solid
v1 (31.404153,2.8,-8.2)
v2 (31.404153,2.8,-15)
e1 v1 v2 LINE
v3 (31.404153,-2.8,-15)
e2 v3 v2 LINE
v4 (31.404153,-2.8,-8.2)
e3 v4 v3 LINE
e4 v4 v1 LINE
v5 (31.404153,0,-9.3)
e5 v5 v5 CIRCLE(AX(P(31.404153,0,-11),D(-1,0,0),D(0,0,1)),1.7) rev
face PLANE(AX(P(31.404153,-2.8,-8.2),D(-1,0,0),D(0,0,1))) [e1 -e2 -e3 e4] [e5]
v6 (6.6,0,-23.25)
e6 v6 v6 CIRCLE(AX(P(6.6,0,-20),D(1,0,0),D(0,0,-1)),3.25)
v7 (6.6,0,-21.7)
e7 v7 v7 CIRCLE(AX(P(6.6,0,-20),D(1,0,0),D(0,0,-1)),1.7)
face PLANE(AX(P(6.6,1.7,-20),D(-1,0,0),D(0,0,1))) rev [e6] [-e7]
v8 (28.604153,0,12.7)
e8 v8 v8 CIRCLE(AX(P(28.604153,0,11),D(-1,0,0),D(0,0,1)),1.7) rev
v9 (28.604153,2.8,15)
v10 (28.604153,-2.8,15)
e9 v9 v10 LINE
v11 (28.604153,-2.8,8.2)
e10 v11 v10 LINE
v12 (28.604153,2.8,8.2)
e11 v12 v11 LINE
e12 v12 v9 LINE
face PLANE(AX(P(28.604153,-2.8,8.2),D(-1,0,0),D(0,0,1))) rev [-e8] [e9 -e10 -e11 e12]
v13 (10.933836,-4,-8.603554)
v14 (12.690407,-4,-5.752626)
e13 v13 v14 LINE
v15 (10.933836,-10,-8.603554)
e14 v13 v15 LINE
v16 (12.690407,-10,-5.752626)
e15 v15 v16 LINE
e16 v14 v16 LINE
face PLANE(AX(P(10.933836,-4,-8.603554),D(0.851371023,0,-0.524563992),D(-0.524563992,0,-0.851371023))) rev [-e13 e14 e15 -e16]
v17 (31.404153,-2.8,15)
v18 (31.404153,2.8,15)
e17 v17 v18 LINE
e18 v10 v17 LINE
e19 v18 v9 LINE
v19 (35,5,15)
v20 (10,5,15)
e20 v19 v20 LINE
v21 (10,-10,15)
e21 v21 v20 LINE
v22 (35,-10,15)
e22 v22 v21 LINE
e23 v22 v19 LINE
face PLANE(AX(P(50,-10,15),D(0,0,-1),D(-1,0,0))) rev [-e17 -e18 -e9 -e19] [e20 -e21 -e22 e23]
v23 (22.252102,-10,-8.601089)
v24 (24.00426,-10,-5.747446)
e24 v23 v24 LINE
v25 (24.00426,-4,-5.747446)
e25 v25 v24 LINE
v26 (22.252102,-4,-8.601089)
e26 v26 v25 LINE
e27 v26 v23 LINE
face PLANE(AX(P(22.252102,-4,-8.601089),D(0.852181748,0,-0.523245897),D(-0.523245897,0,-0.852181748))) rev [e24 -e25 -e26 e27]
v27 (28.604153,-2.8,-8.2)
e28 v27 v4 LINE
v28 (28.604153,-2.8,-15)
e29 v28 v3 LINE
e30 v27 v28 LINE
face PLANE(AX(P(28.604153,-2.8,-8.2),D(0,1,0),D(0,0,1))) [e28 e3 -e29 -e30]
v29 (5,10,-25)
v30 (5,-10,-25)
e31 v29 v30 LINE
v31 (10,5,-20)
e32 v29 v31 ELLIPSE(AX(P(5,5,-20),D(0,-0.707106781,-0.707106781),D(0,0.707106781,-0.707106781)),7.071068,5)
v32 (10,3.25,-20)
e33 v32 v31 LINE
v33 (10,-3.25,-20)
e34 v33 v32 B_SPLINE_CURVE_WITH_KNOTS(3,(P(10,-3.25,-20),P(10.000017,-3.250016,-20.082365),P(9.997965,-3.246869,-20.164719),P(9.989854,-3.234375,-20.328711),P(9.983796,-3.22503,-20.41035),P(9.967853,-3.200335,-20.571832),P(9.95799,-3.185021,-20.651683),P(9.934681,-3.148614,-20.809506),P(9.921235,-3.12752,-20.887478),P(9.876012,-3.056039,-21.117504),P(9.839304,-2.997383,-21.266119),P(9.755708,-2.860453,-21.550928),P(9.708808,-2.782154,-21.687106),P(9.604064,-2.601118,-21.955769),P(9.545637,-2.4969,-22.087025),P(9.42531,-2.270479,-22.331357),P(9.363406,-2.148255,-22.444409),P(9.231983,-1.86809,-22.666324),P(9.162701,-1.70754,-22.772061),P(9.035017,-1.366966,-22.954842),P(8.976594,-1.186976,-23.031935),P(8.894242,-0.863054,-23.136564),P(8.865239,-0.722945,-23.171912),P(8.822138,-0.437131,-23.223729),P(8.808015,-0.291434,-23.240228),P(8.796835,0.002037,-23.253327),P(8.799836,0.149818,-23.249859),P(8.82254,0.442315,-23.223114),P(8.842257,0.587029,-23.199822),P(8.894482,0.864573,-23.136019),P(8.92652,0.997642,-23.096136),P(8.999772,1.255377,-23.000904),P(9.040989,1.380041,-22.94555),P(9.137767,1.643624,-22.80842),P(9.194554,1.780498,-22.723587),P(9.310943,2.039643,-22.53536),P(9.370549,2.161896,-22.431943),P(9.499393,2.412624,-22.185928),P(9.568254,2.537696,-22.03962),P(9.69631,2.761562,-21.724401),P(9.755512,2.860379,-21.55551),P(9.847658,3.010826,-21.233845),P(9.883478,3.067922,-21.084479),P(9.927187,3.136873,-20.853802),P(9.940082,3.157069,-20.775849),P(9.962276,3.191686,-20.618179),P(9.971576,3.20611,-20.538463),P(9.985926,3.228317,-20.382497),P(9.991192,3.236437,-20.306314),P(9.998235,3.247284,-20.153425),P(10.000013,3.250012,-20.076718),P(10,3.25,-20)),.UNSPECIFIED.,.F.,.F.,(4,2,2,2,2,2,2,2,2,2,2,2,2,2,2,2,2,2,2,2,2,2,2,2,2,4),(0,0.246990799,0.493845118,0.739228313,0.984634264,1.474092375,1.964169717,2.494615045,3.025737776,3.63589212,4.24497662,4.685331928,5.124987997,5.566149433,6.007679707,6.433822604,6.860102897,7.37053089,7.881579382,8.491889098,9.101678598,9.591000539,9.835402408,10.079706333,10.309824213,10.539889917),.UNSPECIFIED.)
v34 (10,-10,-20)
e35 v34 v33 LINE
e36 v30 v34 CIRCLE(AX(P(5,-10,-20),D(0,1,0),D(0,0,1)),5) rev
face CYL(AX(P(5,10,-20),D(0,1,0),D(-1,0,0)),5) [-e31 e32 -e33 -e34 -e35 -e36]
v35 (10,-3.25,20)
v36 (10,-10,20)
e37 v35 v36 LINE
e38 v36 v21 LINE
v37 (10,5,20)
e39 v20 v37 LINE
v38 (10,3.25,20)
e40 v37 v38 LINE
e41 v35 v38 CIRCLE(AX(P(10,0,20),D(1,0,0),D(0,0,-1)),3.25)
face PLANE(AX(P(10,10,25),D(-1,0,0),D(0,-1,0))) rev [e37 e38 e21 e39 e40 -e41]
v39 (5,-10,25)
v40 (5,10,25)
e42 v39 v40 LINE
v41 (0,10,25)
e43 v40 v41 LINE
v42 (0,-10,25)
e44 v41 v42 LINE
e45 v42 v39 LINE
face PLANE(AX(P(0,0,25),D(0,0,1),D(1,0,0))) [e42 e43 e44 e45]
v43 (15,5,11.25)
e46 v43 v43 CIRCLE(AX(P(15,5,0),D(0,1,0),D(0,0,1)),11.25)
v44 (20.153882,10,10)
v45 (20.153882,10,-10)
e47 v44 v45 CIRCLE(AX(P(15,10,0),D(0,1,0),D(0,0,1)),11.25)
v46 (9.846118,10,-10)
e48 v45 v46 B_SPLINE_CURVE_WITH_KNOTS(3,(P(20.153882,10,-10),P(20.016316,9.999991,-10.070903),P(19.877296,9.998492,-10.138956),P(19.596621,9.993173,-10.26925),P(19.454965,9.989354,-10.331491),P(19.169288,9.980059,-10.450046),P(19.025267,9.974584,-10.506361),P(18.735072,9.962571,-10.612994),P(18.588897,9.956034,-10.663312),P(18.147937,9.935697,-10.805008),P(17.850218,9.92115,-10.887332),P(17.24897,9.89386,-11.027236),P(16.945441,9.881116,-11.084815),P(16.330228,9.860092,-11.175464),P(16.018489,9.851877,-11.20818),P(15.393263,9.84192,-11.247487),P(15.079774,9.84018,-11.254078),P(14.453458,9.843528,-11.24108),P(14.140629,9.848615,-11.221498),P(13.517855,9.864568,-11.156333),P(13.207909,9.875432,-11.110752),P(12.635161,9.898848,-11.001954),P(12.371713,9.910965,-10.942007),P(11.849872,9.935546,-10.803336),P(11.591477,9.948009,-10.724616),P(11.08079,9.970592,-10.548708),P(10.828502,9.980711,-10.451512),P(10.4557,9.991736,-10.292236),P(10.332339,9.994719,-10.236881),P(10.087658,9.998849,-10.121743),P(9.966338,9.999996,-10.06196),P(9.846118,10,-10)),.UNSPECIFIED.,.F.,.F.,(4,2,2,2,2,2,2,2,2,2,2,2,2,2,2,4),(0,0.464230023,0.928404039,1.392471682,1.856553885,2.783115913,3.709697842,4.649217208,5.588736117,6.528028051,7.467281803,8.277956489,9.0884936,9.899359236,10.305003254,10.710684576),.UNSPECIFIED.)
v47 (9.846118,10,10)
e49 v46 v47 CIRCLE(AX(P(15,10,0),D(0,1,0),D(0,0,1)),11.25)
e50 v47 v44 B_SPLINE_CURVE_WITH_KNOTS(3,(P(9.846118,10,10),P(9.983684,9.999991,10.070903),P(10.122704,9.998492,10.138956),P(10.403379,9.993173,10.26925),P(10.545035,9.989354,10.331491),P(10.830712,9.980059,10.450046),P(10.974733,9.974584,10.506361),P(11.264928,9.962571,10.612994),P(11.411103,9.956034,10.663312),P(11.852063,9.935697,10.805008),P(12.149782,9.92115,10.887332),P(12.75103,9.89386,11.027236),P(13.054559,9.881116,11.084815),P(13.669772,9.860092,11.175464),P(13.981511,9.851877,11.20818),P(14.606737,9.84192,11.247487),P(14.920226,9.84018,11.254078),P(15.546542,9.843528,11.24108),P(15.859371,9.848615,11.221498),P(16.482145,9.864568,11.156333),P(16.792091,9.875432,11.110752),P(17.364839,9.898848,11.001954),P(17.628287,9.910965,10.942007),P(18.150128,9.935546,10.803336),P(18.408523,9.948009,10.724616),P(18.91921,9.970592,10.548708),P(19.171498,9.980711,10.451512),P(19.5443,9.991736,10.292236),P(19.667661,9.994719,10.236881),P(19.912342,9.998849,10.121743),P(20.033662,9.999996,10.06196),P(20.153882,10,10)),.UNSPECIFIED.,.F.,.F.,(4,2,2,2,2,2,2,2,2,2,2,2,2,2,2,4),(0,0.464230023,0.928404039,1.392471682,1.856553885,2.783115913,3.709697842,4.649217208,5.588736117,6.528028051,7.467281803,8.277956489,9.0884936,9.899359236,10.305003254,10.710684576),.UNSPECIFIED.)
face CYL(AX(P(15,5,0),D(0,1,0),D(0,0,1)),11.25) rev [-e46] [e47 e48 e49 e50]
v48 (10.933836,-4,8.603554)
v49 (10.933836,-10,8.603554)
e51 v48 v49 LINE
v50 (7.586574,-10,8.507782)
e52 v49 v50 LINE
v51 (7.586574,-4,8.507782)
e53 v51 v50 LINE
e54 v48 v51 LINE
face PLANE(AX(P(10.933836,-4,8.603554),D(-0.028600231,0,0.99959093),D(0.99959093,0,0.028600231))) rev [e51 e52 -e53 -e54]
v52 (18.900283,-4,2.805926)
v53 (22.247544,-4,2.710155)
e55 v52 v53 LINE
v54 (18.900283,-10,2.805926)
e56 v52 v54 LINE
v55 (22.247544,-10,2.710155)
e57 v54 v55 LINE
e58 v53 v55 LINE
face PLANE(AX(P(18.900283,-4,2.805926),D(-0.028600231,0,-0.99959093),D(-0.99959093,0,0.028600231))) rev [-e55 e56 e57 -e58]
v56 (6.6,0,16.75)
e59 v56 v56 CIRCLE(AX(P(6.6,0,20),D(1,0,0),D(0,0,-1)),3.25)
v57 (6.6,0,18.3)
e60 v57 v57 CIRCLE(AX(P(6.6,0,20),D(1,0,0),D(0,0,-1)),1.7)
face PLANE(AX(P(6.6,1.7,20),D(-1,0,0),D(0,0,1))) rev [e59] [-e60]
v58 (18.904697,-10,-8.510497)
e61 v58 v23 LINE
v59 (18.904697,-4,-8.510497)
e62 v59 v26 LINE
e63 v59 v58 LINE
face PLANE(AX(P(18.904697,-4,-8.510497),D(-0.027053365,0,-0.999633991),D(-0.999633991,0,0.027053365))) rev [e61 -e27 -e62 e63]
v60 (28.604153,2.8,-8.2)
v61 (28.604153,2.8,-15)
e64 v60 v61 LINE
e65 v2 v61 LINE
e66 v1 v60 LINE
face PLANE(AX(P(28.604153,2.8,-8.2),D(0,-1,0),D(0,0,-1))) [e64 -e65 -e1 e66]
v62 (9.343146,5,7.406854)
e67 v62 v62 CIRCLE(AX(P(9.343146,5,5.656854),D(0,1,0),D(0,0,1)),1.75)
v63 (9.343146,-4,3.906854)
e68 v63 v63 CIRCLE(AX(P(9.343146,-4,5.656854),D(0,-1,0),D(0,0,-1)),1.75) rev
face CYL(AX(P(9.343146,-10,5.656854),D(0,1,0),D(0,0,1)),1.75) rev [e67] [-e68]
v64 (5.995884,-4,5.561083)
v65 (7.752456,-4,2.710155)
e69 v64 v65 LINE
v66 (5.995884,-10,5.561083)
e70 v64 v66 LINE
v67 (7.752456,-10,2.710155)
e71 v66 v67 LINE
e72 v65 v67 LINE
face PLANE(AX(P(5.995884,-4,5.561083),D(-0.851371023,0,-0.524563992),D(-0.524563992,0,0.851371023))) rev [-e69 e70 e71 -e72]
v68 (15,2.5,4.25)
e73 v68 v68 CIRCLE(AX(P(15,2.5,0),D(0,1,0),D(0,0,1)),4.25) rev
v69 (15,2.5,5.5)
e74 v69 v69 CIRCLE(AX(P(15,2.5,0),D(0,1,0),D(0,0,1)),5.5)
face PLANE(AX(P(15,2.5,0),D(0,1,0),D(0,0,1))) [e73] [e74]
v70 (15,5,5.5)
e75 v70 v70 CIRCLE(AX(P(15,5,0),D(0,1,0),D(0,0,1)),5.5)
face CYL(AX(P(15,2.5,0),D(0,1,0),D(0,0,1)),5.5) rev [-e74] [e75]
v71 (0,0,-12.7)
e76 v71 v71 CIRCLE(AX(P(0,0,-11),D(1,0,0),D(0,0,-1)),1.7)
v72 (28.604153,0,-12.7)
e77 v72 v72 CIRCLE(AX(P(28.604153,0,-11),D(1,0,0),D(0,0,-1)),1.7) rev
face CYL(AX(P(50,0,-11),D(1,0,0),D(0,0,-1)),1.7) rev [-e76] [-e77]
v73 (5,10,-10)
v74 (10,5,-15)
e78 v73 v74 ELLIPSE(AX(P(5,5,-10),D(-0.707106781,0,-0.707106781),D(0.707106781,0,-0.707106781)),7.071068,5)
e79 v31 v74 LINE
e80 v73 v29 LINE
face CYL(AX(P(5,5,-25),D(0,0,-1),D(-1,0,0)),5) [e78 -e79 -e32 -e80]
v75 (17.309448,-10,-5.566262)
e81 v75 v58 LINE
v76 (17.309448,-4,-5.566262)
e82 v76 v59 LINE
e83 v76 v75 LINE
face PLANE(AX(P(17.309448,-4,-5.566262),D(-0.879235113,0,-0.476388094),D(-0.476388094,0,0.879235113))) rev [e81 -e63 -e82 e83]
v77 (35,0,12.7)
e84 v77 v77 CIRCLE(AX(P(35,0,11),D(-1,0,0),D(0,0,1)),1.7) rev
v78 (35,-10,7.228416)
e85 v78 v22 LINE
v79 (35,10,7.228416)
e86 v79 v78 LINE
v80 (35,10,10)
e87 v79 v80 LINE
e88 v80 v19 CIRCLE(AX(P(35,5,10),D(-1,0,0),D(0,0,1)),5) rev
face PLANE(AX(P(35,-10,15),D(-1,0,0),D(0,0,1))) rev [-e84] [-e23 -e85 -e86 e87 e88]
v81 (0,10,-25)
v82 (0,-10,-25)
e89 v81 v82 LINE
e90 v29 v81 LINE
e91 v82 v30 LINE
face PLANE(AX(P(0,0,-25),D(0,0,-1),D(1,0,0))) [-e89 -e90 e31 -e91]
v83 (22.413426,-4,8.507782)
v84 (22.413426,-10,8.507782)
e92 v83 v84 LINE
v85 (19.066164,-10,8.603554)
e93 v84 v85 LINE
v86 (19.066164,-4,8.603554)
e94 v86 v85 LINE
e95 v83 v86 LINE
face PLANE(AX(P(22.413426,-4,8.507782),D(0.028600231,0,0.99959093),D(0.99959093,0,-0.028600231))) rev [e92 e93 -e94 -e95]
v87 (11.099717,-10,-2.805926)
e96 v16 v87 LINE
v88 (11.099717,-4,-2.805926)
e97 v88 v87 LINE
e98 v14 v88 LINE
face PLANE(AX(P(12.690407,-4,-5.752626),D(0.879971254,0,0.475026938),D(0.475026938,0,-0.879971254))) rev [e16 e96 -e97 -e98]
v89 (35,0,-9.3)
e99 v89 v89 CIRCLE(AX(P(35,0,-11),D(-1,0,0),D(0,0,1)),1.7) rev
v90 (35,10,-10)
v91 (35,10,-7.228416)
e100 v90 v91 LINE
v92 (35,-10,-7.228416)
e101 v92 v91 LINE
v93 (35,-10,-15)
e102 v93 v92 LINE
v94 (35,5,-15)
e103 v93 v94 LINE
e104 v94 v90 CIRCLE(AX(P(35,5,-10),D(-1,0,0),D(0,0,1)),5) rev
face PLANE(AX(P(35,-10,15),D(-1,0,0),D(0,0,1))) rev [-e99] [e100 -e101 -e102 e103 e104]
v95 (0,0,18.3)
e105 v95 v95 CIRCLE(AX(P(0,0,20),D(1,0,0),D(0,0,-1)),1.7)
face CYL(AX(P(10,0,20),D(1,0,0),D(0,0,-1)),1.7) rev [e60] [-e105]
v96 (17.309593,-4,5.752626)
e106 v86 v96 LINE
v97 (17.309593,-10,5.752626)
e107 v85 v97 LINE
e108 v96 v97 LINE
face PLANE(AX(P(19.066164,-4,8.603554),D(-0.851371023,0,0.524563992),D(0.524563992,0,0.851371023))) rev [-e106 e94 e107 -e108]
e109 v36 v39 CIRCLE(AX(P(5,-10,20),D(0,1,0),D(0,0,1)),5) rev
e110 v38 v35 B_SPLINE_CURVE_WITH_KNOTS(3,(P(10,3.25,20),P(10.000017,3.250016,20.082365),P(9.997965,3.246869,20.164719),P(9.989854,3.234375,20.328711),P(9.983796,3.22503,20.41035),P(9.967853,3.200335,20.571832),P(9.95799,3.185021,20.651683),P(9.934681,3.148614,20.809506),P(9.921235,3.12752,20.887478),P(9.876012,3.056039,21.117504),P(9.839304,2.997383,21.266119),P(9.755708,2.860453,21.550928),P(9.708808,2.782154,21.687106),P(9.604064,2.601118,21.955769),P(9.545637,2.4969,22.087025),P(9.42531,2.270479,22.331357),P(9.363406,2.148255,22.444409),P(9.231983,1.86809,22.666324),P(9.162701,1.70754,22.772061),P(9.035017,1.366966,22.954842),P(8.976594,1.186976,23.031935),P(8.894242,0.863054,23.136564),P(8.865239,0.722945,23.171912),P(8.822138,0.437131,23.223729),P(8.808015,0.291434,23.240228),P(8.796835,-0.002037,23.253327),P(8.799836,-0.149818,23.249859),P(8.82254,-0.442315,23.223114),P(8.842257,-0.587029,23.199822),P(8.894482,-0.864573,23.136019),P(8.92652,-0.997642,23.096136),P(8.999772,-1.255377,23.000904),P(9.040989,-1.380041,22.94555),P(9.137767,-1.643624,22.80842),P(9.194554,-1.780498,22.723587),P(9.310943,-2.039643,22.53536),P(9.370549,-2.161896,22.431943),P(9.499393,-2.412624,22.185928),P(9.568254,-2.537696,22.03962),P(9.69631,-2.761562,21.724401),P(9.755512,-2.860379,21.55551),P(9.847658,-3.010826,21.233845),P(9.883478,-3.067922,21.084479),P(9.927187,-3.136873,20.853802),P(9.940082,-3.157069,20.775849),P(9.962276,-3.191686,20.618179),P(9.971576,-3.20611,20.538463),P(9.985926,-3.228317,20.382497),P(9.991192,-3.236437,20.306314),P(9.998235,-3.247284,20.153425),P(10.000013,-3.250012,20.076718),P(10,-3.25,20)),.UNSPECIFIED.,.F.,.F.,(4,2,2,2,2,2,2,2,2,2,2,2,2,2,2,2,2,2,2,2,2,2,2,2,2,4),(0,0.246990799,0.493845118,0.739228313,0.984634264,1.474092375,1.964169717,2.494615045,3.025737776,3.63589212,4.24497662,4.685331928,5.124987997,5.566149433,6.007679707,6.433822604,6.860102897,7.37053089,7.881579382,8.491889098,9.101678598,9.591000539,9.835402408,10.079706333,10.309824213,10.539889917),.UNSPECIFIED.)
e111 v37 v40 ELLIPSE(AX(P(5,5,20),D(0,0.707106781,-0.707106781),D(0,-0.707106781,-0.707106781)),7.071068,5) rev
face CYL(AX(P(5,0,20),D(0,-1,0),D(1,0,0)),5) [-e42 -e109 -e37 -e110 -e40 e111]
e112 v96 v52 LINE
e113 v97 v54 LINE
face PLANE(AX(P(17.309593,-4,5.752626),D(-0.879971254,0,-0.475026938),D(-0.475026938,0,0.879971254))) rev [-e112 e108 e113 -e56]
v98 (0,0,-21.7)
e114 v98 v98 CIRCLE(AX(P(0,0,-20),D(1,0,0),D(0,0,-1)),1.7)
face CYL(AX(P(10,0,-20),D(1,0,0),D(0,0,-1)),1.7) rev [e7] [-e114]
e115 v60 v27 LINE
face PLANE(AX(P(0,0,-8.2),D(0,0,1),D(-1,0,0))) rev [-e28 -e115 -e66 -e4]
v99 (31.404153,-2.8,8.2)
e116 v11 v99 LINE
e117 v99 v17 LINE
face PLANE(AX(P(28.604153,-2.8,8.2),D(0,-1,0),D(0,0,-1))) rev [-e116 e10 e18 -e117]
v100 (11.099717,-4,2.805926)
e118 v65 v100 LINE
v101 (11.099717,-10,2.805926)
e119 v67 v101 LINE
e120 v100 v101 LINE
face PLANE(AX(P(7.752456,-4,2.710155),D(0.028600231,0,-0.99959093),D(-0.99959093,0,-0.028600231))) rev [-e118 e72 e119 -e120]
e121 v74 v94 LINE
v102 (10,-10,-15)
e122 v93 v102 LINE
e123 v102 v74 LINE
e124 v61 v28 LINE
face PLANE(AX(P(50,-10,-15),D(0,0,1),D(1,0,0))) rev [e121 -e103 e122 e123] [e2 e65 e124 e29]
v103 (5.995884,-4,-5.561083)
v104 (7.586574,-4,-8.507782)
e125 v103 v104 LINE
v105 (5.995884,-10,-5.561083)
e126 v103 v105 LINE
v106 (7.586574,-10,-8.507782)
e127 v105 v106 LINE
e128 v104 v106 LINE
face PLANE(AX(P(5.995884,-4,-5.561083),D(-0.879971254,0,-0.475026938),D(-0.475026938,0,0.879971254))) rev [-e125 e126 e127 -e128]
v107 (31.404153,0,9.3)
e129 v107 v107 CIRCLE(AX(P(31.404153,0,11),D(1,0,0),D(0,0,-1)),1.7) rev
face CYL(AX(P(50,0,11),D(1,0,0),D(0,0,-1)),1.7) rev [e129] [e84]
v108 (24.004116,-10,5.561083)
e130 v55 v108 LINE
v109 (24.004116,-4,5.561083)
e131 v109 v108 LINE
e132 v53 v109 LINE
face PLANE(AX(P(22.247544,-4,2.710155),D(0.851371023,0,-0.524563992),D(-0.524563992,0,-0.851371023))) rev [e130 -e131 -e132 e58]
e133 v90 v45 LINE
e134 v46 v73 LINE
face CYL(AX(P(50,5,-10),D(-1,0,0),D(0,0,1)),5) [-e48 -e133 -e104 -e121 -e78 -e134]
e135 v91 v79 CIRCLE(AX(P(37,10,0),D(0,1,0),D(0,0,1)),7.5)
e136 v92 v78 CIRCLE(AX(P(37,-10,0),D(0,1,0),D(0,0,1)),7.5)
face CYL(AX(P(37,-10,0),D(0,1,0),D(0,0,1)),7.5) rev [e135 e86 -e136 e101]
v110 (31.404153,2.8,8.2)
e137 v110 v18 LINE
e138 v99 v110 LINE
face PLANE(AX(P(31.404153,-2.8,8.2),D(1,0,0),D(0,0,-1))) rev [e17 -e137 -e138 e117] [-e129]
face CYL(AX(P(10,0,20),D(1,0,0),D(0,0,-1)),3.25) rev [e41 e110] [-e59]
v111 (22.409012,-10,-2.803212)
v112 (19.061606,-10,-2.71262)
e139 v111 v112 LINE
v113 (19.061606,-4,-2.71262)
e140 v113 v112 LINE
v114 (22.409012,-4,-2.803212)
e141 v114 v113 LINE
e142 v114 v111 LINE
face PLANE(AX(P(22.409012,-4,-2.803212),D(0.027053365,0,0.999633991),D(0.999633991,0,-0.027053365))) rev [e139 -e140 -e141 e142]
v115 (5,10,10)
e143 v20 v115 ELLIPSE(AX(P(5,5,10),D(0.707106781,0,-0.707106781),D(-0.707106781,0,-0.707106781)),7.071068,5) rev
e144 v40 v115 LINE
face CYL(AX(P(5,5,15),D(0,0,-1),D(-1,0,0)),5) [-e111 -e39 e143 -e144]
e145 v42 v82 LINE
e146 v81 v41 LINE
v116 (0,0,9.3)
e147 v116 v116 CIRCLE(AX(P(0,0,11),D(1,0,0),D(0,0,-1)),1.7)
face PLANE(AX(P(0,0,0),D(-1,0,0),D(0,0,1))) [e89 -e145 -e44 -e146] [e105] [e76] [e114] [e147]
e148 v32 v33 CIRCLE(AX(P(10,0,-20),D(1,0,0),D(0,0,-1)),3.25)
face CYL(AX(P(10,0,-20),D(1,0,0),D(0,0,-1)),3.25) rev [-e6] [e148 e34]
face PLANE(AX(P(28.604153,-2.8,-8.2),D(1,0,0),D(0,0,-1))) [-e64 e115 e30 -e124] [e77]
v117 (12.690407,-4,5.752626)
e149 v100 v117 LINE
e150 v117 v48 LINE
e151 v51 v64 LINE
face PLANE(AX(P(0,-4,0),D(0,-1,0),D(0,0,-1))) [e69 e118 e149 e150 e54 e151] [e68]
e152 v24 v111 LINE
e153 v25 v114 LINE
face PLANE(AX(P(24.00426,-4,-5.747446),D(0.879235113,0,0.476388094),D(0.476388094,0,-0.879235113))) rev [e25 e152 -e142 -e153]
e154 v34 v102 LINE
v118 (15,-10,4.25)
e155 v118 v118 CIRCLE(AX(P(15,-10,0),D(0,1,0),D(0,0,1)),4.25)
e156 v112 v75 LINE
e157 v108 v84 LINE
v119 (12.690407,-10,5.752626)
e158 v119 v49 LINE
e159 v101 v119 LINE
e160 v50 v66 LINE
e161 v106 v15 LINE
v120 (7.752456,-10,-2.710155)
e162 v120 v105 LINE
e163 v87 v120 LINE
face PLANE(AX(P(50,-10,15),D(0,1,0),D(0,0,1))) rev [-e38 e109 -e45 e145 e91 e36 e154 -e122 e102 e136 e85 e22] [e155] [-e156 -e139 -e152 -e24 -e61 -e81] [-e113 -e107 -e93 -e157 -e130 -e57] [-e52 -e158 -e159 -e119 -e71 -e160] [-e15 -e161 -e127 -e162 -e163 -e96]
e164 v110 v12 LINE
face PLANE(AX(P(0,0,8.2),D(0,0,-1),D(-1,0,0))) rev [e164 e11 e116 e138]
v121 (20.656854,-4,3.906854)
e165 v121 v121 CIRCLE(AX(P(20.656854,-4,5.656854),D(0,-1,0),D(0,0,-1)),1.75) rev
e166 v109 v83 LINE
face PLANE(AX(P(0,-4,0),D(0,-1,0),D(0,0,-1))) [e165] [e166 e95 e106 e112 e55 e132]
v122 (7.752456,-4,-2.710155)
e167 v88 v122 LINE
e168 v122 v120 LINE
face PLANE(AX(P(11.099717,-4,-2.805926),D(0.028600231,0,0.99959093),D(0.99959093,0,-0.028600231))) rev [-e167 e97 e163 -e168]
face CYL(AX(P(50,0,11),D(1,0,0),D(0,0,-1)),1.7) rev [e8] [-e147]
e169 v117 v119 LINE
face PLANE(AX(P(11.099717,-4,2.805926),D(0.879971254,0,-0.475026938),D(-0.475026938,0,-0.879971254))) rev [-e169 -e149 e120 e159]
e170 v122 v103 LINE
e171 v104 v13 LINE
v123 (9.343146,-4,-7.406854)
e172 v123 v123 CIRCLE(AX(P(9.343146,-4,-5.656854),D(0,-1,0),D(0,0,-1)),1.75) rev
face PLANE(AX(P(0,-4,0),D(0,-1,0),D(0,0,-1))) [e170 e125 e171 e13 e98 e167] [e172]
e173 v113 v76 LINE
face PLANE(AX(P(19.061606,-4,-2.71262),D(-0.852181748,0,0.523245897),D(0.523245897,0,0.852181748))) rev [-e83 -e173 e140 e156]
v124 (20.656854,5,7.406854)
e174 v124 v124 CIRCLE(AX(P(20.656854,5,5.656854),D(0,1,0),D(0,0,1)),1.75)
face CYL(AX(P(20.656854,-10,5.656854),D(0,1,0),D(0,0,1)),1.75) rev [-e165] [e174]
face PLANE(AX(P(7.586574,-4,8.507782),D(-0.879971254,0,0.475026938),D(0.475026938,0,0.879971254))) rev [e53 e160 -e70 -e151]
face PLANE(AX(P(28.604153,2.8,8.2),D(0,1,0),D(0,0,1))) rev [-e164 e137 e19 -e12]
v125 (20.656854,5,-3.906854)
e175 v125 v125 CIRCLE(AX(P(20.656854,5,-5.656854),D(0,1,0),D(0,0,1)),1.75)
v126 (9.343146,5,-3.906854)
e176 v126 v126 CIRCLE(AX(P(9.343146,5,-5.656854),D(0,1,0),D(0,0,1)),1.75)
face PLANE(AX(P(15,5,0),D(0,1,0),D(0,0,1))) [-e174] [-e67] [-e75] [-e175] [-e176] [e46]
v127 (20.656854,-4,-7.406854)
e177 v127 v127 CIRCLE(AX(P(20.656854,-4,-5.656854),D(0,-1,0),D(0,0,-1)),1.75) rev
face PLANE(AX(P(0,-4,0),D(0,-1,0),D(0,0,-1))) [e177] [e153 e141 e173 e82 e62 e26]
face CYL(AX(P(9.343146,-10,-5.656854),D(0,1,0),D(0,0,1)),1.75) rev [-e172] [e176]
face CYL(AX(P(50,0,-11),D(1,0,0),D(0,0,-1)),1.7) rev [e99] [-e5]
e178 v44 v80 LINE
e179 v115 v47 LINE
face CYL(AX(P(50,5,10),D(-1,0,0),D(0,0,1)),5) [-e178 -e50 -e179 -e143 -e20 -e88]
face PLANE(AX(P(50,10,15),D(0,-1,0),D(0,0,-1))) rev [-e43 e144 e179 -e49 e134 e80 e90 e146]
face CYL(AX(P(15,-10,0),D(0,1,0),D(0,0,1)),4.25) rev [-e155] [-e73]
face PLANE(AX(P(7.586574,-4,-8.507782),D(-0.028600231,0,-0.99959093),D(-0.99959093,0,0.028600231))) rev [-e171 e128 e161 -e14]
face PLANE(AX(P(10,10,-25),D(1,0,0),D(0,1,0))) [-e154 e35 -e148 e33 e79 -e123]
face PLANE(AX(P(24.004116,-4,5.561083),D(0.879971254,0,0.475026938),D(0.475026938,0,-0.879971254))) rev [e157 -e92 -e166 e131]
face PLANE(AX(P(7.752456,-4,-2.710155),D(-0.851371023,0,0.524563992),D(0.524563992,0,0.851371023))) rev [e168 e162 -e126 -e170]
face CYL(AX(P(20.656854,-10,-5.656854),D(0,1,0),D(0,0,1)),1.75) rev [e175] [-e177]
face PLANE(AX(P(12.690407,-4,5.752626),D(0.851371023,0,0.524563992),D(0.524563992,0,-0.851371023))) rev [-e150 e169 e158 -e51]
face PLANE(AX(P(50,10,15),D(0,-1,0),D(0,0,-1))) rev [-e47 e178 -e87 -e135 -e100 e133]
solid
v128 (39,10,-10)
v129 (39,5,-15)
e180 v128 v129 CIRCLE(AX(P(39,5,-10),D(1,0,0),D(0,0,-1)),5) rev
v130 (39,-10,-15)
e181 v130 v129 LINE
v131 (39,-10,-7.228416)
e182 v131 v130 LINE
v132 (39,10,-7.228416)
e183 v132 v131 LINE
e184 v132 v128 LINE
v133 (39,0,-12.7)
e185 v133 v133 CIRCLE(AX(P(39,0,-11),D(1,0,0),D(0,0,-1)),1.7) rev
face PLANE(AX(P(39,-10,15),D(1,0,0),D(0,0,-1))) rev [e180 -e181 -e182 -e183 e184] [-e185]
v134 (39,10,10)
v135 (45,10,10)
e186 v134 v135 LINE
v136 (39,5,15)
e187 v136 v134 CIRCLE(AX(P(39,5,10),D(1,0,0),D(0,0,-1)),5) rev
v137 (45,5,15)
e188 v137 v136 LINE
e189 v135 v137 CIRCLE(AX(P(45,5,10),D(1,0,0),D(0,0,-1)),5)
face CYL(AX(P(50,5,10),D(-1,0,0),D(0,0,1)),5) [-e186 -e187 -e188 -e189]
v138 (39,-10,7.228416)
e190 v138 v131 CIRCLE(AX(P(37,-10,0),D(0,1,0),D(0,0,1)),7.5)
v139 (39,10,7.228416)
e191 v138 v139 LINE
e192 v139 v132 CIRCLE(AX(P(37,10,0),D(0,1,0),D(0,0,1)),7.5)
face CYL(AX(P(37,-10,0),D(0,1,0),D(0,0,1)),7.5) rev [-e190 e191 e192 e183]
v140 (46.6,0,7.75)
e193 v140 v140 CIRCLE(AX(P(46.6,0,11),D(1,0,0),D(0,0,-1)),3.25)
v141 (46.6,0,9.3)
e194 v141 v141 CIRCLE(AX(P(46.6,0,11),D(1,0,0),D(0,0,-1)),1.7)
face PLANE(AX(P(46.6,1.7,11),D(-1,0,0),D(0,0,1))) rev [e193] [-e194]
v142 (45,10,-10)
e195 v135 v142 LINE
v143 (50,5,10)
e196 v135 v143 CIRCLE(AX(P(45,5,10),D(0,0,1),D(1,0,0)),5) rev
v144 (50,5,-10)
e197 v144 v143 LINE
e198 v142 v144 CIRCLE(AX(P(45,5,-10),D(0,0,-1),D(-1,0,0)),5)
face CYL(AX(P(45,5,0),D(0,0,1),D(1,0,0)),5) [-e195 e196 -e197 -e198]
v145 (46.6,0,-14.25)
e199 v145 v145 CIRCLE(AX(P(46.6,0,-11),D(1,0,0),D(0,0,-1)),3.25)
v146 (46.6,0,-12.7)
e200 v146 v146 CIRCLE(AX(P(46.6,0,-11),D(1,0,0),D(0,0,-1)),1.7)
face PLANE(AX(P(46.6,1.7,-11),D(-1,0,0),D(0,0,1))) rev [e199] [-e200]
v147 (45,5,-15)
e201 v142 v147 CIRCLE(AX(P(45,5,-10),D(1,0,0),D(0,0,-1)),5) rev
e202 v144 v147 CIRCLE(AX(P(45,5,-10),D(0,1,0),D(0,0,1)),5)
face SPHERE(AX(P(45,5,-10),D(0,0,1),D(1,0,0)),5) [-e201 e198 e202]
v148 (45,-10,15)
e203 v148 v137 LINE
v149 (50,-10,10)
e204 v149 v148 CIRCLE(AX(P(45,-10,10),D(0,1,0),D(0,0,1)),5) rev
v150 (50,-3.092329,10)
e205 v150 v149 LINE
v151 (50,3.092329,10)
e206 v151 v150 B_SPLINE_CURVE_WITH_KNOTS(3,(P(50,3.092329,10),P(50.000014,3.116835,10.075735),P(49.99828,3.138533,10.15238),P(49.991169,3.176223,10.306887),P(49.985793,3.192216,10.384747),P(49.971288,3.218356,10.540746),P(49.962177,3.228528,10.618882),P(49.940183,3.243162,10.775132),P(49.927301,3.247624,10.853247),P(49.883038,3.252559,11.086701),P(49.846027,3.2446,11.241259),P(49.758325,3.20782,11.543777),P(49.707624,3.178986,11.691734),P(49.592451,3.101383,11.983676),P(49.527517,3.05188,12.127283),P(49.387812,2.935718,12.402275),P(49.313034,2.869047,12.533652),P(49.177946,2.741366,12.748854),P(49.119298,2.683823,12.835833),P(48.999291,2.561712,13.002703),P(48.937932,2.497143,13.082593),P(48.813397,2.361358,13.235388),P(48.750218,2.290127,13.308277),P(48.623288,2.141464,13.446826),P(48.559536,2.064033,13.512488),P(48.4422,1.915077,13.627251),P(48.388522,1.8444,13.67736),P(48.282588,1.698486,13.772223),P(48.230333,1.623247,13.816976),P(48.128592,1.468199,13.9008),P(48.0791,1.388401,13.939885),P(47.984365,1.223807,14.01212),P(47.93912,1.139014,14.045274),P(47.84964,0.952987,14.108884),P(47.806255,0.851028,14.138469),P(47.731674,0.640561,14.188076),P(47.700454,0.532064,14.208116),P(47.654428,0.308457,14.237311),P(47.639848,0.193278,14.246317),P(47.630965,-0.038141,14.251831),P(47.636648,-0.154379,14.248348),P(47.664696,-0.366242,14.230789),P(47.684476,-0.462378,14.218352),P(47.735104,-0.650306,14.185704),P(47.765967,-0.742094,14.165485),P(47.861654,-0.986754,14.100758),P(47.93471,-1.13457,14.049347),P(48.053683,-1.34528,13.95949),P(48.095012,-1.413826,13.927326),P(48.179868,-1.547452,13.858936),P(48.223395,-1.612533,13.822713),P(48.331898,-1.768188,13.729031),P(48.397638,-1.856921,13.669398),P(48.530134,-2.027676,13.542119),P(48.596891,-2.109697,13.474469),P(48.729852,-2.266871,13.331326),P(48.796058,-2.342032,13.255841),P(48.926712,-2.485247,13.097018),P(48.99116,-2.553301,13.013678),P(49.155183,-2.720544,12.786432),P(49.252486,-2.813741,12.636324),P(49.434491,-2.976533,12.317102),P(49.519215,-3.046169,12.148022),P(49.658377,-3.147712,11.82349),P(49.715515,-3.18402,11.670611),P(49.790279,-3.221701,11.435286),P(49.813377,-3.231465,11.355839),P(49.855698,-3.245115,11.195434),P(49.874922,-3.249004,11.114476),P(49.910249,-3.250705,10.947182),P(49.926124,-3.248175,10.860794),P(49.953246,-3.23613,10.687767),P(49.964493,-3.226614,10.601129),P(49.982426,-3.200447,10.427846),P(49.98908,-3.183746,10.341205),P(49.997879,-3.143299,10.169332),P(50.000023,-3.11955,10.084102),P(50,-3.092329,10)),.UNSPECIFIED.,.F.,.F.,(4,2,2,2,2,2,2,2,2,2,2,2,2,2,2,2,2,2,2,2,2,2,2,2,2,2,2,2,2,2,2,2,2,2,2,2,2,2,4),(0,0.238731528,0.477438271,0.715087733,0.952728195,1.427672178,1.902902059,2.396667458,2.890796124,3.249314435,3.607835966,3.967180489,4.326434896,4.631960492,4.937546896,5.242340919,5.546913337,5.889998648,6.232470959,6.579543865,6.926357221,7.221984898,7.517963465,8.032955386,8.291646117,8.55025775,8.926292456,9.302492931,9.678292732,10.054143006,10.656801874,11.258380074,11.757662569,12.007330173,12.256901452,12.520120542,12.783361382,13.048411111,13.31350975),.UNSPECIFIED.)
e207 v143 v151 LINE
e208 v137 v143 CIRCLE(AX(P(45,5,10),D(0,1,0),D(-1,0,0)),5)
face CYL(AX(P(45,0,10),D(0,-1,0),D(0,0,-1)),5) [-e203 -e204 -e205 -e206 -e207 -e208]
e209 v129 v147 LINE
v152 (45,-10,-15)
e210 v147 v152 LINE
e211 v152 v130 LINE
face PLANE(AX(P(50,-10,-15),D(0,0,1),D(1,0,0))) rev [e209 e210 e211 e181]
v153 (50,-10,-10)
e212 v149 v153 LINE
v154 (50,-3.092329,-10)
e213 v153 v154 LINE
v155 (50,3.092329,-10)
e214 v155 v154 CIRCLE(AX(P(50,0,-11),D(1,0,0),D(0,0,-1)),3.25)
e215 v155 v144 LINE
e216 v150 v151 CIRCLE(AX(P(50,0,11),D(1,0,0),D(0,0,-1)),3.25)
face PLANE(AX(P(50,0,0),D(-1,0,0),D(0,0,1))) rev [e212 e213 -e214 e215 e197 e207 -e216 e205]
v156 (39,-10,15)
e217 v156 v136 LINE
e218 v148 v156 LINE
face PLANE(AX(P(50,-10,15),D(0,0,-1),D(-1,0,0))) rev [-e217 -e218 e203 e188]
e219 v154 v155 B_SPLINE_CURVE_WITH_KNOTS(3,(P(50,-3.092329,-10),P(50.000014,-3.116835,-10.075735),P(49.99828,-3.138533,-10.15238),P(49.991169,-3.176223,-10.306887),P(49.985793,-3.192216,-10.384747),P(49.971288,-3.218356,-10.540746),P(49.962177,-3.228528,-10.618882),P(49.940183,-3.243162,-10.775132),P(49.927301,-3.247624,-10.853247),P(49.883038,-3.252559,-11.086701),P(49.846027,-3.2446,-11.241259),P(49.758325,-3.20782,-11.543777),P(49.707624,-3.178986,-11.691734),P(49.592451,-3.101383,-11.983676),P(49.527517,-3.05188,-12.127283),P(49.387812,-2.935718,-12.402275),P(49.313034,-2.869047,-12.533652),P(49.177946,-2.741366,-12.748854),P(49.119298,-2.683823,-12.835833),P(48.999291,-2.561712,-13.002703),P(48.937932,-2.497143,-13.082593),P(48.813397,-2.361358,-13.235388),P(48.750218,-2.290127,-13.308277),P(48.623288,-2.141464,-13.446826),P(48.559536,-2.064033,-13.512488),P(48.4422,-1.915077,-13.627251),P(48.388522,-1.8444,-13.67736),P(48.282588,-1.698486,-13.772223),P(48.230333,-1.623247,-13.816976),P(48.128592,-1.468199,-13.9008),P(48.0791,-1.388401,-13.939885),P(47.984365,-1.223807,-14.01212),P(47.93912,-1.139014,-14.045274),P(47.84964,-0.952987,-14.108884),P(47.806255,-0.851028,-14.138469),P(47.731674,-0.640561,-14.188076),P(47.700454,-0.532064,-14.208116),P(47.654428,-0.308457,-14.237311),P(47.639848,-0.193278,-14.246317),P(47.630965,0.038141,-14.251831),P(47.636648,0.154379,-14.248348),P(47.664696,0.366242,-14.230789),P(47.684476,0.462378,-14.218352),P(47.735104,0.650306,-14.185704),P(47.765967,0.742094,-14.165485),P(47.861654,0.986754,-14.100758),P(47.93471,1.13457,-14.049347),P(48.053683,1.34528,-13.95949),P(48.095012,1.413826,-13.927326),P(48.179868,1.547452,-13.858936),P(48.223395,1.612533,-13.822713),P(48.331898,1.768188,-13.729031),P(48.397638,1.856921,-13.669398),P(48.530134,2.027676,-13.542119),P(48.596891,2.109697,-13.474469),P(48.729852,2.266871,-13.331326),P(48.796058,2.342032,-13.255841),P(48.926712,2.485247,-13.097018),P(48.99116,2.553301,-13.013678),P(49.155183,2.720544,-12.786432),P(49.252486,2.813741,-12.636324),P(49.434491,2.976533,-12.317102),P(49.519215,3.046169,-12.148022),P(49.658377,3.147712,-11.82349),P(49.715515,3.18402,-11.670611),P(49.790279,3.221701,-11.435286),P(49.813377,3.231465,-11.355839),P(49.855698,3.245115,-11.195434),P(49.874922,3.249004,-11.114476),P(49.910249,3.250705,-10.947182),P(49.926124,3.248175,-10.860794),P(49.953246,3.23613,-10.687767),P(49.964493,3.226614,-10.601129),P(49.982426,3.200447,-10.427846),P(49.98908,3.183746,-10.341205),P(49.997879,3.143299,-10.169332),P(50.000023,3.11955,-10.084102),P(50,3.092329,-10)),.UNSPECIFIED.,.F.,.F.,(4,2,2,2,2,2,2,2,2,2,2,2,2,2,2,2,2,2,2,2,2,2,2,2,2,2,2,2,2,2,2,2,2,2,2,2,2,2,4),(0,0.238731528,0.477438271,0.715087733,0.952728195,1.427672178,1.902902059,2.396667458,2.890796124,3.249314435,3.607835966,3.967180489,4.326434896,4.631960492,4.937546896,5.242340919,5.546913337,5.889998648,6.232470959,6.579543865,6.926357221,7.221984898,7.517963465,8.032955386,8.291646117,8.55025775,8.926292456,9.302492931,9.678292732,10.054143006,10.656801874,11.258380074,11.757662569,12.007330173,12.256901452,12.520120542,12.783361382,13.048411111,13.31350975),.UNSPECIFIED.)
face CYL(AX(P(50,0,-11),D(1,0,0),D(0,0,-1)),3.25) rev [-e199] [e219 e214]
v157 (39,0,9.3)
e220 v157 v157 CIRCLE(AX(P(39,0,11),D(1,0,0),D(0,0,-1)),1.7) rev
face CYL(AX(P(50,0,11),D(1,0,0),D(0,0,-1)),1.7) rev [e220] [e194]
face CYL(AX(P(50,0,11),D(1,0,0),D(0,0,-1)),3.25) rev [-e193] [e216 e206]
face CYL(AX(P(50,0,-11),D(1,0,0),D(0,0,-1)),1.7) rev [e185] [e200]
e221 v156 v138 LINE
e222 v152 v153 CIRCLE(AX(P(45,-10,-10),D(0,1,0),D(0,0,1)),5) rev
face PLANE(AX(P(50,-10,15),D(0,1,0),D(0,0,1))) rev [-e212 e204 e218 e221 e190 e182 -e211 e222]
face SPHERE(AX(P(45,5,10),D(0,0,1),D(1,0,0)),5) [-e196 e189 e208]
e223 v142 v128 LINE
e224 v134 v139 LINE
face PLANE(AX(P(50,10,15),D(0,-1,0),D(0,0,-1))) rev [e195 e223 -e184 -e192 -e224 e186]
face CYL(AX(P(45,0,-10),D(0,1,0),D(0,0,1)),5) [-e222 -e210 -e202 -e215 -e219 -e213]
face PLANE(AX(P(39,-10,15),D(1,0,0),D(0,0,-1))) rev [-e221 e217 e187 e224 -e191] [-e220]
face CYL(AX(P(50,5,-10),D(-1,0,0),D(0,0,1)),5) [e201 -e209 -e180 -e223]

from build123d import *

# Parameters (mm, degrees)
SKETCH1_W                                           = 30
SKETCH1_H                                           = 20
BOSS_EXTRUDE1_DEPTH                                 = 50
SKETCH2_R                                           = 4.25
SKETCH2_R_2                                         = 7.5
CUT_EXTRUDE1_DEPTH                                  = 56.901699437
SKETCH4_R                                           = 11.25
CUT_EXTRUDE3_DEPTH                                  = 5
SKETCH5_R                                           = 1.75
CUT_EXTRUDE4_DEPTH                                  = 55.313902456
CUT_EXTRUDE5_DEPTH                                  = 6
SKETCH7_W                                           = 10
SKETCH7_H                                           = 20
BOSS_EXTRUDE2_DEPTH                                 = 10
CBORE_FOR_M3_HEX_SOCKET_HEAD_CAP_SCREW4_D           = 3.4
CBORE_FOR_M3_HEX_SOCKET_HEAD_CAP_SCREW4_CBORE_D     = 6.5
CBORE_FOR_M3_HEX_SOCKET_HEAD_CAP_SCREW4_CBORE_DEPTH = 3.4
CBORE_FOR_M3_HEX_SOCKET_HEAD_CAP_SCREW3_D           = 3.4
CBORE_FOR_M3_HEX_SOCKET_HEAD_CAP_SCREW3_CBORE_D     = 6.5
CBORE_FOR_M3_HEX_SOCKET_HEAD_CAP_SCREW3_CBORE_DEPTH = 3.4
SKETCH18_W                                          = 2.8
SKETCH18_H                                          = 5.6
CUT_EXTRUDE8_DEPTH                                  = 6.8
SKETCH3_W                                           = 4
SKETCH3_H                                           = 30
CUT_EXTRUDE9_DEPTH                                  = 60.371710435
FILLET4_R                                           = 5
FILLET5_R                                           = 5
SKETCH19_R                                          = 5.5
CUT_EXTRUDE10_DEPTH                                 = 2.5


with BuildPart() as part:
    # Sketch1 → Boss-Extrude1 (new body)
    with BuildSketch(Plane(origin=(0, 0, 0), x_dir=(0, 0, -1), z_dir=(1, 0, 0))):
        Rectangle(SKETCH1_W, SKETCH1_H)
    extrude(amount=BOSS_EXTRUDE1_DEPTH)

    # Sketch2 → Cut-Extrude1 (cut, through all)
    with BuildSketch(Plane(origin=(0, 10, 0), x_dir=(1, 0, 0), z_dir=(0, 1, 0))):
        with Locations(Location((15, 0, 0), (0, 0, 270))):
            Circle(SKETCH2_R)
        with Locations(Location((37, 0, 0), (0, 0, 270))):
            Circle(SKETCH2_R_2)
    extrude(amount=-CUT_EXTRUDE1_DEPTH, mode=Mode.SUBTRACT)

    # Sketch4 → Cut-Extrude3 (cut)
    with BuildSketch(Plane(origin=(0, 10, 0), x_dir=(1, 0, 0), z_dir=(0, 1, 0))):
        with Locations(Location((15, 0, 0), (0, 0, 270))):
            Circle(SKETCH4_R)
    extrude(amount=-CUT_EXTRUDE3_DEPTH, mode=Mode.SUBTRACT)

    # Sketch5 → Cut-Extrude4 (cut, through all)
    with BuildSketch(Plane(origin=(0, 5, 0), x_dir=(1, 0, 0), z_dir=(0, 1, 0))):
        with Locations(Location((9.343145751, -5.656854249, 0), (0, 0, 270))):
            Circle(SKETCH5_R)
        with Locations(Location((9.343145751, 5.656854249, 0), (0, 0, 270))):
            Circle(SKETCH5_R)
        with Locations(Location((20.656854249, 5.656854249, 0), (0, 0, 270))):
            Circle(SKETCH5_R)
        with Locations(Location((20.656854249, -5.656854249, 0), (0, 0, 270))):
            Circle(SKETCH5_R)
    extrude(amount=-CUT_EXTRUDE4_DEPTH, mode=Mode.SUBTRACT)

    # Sketch6 → Cut-Extrude5 (cut)
    with BuildSketch(Plane.XZ.offset(10)):
        Polygon((12.690407486, 5.752625887), (10.933835947, 8.603553764), (7.586574212, 8.507782127), (5.995884015, 5.561082612), (7.752455554, 2.710154735), (11.099717289, 2.805926372), align=None)
        Polygon((17.309592514, 5.752625887), (18.900282711, 2.805926372), (22.247544446, 2.710154735), (24.004115985, 5.561082612), (22.413425788, 8.507782127), (19.066164053, 8.603553764), align=None)
        Polygon((24.004260181, -5.747446002), (22.409011974, -2.803211553), (19.061606043, -2.7126198), (17.309448318, -5.566262497), (18.904696525, -8.510496946), (22.252102456, -8.601088699), align=None)
        Polygon((12.690407486, -5.752625887), (11.099717289, -2.805926372), (7.752455554, -2.710154735), (5.995884015, -5.561082612), (7.586574212, -8.507782127), (10.933835947, -8.603553764), align=None)
    extrude(amount=-CUT_EXTRUDE5_DEPTH, mode=Mode.SUBTRACT)

    # Sketch7 → Boss-Extrude2 (add)
    with BuildSketch(Plane.XY.offset(15)):
        with Locations((5, 0)):
            Rectangle(SKETCH7_W, SKETCH7_H)
    boss_extrude2 = extrude(amount=BOSS_EXTRUDE2_DEPTH)

    # CBORE for M3 Hex Socket Head Cap Screw4 (through all)
    with Locations(Plane(origin=(10, 0, 0), x_dir=(0, 0, -1), z_dir=(1, 0, 0))):
        with Locations((-20, 0)):
            cbore_for_m3_hex_socket_head_cap_screw4 = CounterBoreHole(CBORE_FOR_M3_HEX_SOCKET_HEAD_CAP_SCREW4_D / 2, CBORE_FOR_M3_HEX_SOCKET_HEAD_CAP_SCREW4_CBORE_D / 2, CBORE_FOR_M3_HEX_SOCKET_HEAD_CAP_SCREW4_CBORE_DEPTH)

    # CBORE for M3 Hex Socket Head Cap Screw3 (through all)
    with Locations(Plane(origin=(50, 0, 0), x_dir=(0, 0, -1), z_dir=(1, 0, 0))):
        with Locations((-11, 0)):
            cbore_for_m3_hex_socket_head_cap_screw3 = CounterBoreHole(CBORE_FOR_M3_HEX_SOCKET_HEAD_CAP_SCREW3_D / 2, CBORE_FOR_M3_HEX_SOCKET_HEAD_CAP_SCREW3_CBORE_D / 2, CBORE_FOR_M3_HEX_SOCKET_HEAD_CAP_SCREW3_CBORE_DEPTH)

    # Sketch18 → Cut-Extrude8 (cut)
    with BuildSketch(Plane.XY.offset(15)):
        with Locations((30.004152543, 0)):
            Rectangle(SKETCH18_W, SKETCH18_H)
    cut_extrude8 = extrude(amount=-CUT_EXTRUDE8_DEPTH, mode=Mode.SUBTRACT)

    # Mirror9: Boss-Extrude2, CBORE for M3 Hex Socket Head Cap Screw4, CBORE for M3 Hex Socket Head Cap Screw3, Cut-Extrude8 across plane
    add(boss_extrude2.mirror(Plane(origin=(0, 0, 0), x_dir=(1, 0, 0), z_dir=(0, 0, -1))))
    add(cbore_for_m3_hex_socket_head_cap_screw4.mirror(Plane(origin=(0, 0, 0), x_dir=(1, 0, 0), z_dir=(0, 0, -1))), mode=Mode.SUBTRACT)
    add(cbore_for_m3_hex_socket_head_cap_screw3.mirror(Plane(origin=(0, 0, 0), x_dir=(1, 0, 0), z_dir=(0, 0, -1))), mode=Mode.SUBTRACT)
    add(cut_extrude8.mirror(Plane(origin=(0, 0, 0), x_dir=(1, 0, 0), z_dir=(0, 0, -1))), mode=Mode.SUBTRACT)

    # Sketch3 → Cut-Extrude9 (cut, through all)
    with BuildSketch(Plane(origin=(0, 10, 0), x_dir=(1, 0, 0), z_dir=(0, 1, 0))):
        with Locations((37, 0)):
            Rectangle(SKETCH3_W, SKETCH3_H)
    extrude(amount=-CUT_EXTRUDE9_DEPTH, mode=Mode.SUBTRACT)


with BuildPart() as cut_extrude9_piece_1:
    # of the separate pieces the step leaves, piece 1, a body of its own (cut_extrude9_pieces)
    add(part.part.solids().sort_by_distance((10, -10, 15))[0])

    # Fillet4
    # the kernel refuses this fillet: 5 mm, written as the material it takes off along each edge
    with BuildSketch(Plane(origin=(10, 10, 25), x_dir=(0, 0, -1), z_dir=(0, -1, 0)), Plane(origin=(10, 10, -25), x_dir=(-1, 0, 0), z_dir=(0, -1, 0))) as fillet4_piece_1:
        with BuildLine():
            CenterArc((FILLET4_R, -FILLET4_R), FILLET4_R, 90, 90)
            Line((0, -FILLET4_R), (-FILLET4_R * 0.02, -FILLET4_R))
            Line((-FILLET4_R * 0.02, -FILLET4_R), (-FILLET4_R * 0.02, FILLET4_R * 0.02))
            Line((-FILLET4_R * 0.02, FILLET4_R * 0.02), (FILLET4_R, FILLET4_R * 0.02))
            Line((FILLET4_R, FILLET4_R * 0.02), (FILLET4_R, 0))
        make_face()
    extrude(amount=20, mode=Mode.SUBTRACT)
    with BuildSketch(Plane(origin=(10, 10, -15), x_dir=(0, -1, 0), z_dir=(0, 0, -1))) as fillet4_piece_2:
        with BuildLine():
            CenterArc((FILLET4_R, FILLET4_R), FILLET4_R, 180, 90)
            Line((0, FILLET4_R), (-FILLET4_R * 0.02, FILLET4_R))
            Line((-FILLET4_R * 0.02, FILLET4_R), (-FILLET4_R * 0.02, -FILLET4_R * 0.02))
            Line((-FILLET4_R * 0.02, -FILLET4_R * 0.02), (FILLET4_R, -FILLET4_R * 0.02))
            Line((FILLET4_R, -FILLET4_R * 0.02), (FILLET4_R, 0))
        make_face()
    extrude(amount=10, mode=Mode.SUBTRACT)
    with BuildSketch(Plane(origin=(10, 10, 15), x_dir=(0, -1, 0), z_dir=(1, 0, 0))) as fillet4_piece_3:
        with BuildLine():
            CenterArc((FILLET4_R, FILLET4_R), FILLET4_R, 180, 90)
            Line((0, FILLET4_R), (-FILLET4_R * 0.02, FILLET4_R))
            Line((-FILLET4_R * 0.02, FILLET4_R), (-FILLET4_R * 0.02, -FILLET4_R * 0.02))
            Line((-FILLET4_R * 0.02, -FILLET4_R * 0.02), (FILLET4_R, -FILLET4_R * 0.02))
            Line((FILLET4_R, -FILLET4_R * 0.02), (FILLET4_R, 0))
        make_face()
    extrude(amount=25, mode=Mode.SUBTRACT)
    with BuildSketch(Plane(origin=(10, 10, -15), x_dir=(0, -1, 0), z_dir=(1, 0, 0))) as fillet4_piece_4:
        with BuildLine():
            CenterArc((FILLET4_R, -FILLET4_R), FILLET4_R, 90, 90)
            Line((0, -FILLET4_R), (-FILLET4_R * 0.02, -FILLET4_R))
            Line((-FILLET4_R * 0.02, -FILLET4_R), (-FILLET4_R * 0.02, FILLET4_R * 0.02))
            Line((-FILLET4_R * 0.02, FILLET4_R * 0.02), (FILLET4_R, FILLET4_R * 0.02))
            Line((FILLET4_R, FILLET4_R * 0.02), (FILLET4_R, 0))
        make_face()
    extrude(amount=25, mode=Mode.SUBTRACT)
    with BuildSketch(Plane(origin=(10, 10, 15), x_dir=(0, -1, 0), z_dir=(0, 0, 1))) as fillet4_piece_5:
        with BuildLine():
            CenterArc((FILLET4_R, -FILLET4_R), FILLET4_R, 90, 90)
            Line((0, -FILLET4_R), (-FILLET4_R * 0.02, -FILLET4_R))
            Line((-FILLET4_R * 0.02, -FILLET4_R), (-FILLET4_R * 0.02, FILLET4_R * 0.02))
            Line((-FILLET4_R * 0.02, FILLET4_R * 0.02), (FILLET4_R, FILLET4_R * 0.02))
            Line((FILLET4_R, FILLET4_R * 0.02), (FILLET4_R, 0))
        make_face()
    extrude(amount=10, mode=Mode.SUBTRACT)
    with BuildSketch(Plane(origin=(10, 10, 15), x_dir=(0, -1, 0), z_dir=(0, 0, 1))) as fillet4_piece_6a_section:
        with BuildLine():
            CenterArc((FILLET4_R, -FILLET4_R), FILLET4_R, 90, 90)
            Line((0, -FILLET4_R), (-FILLET4_R * 0.02, -FILLET4_R))
            Line((-FILLET4_R * 0.02, -FILLET4_R), (-FILLET4_R * 0.02, FILLET4_R * 0.02))
            Line((-FILLET4_R * 0.02, FILLET4_R * 0.02), (FILLET4_R, FILLET4_R * 0.02))
            Line((FILLET4_R, FILLET4_R * 0.02), (FILLET4_R, 0))
        make_face()
    fillet4_piece_6a = extrude(amount=22.5, mode=Mode.PRIVATE)
    fillet4_piece_6a = split(fillet4_piece_6a, bisect_by=Plane(origin=(8.868024429, 8.868024429, 25), z_dir=(0, 0, 1)), keep=Keep.TOP, mode=Mode.PRIVATE)
    with BuildSketch(Plane(origin=(10, 22.5, 25), x_dir=(0, 0, -1), z_dir=(0, -1, 0))) as fillet4_piece_6b_section:
        with BuildLine():
            CenterArc((FILLET4_R, -FILLET4_R), FILLET4_R, 90, 90)
            Line((0, -FILLET4_R), (-FILLET4_R * 0.02, -FILLET4_R))
            Line((-FILLET4_R * 0.02, -FILLET4_R), (-FILLET4_R * 0.02, FILLET4_R * 0.02))
            Line((-FILLET4_R * 0.02, FILLET4_R * 0.02), (FILLET4_R, FILLET4_R * 0.02))
            Line((FILLET4_R, FILLET4_R * 0.02), (FILLET4_R, 0))
        make_face()
    fillet4_piece_6b = extrude(amount=32.5, mode=Mode.PRIVATE)
    fillet4_piece_6b = split(fillet4_piece_6b, bisect_by=Plane(origin=(8.868024429, 10, 23.868024429), z_dir=(0, 1, 0)), keep=Keep.TOP, mode=Mode.PRIVATE)
    fillet4_piece_6 = fillet4_piece_6a & fillet4_piece_6b
    add(fillet4_piece_6, mode=Mode.SUBTRACT)
    with BuildSketch(Plane(origin=(10, 22.5, -25), x_dir=(-1, 0, 0), z_dir=(0, -1, 0))) as fillet4_piece_7a_section:
        with BuildLine():
            CenterArc((FILLET4_R, -FILLET4_R), FILLET4_R, 90, 90)
            Line((0, -FILLET4_R), (-FILLET4_R * 0.02, -FILLET4_R))
            Line((-FILLET4_R * 0.02, -FILLET4_R), (-FILLET4_R * 0.02, FILLET4_R * 0.02))
            Line((-FILLET4_R * 0.02, FILLET4_R * 0.02), (FILLET4_R, FILLET4_R * 0.02))
            Line((FILLET4_R, FILLET4_R * 0.02), (FILLET4_R, 0))
        make_face()
    fillet4_piece_7a = extrude(amount=32.5, mode=Mode.PRIVATE)
    fillet4_piece_7a = split(fillet4_piece_7a, bisect_by=Plane(origin=(8.868024429, 10, -23.868024429), z_dir=(0, 1, 0)), keep=Keep.TOP, mode=Mode.PRIVATE)
    with BuildSketch(Plane(origin=(10, 10, -15), x_dir=(0, -1, 0), z_dir=(0, 0, -1))) as fillet4_piece_7b_section:
        with BuildLine():
            CenterArc((FILLET4_R, FILLET4_R), FILLET4_R, 180, 90)
            Line((0, FILLET4_R), (-FILLET4_R * 0.02, FILLET4_R))
            Line((-FILLET4_R * 0.02, FILLET4_R), (-FILLET4_R * 0.02, -FILLET4_R * 0.02))
            Line((-FILLET4_R * 0.02, -FILLET4_R * 0.02), (FILLET4_R, -FILLET4_R * 0.02))
            Line((FILLET4_R, -FILLET4_R * 0.02), (FILLET4_R, 0))
        make_face()
    fillet4_piece_7b = extrude(amount=22.5, mode=Mode.PRIVATE)
    fillet4_piece_7b = split(fillet4_piece_7b, bisect_by=Plane(origin=(8.868024429, 8.868024429, -25), z_dir=(0, 0, -1)), keep=Keep.TOP, mode=Mode.PRIVATE)
    fillet4_piece_7 = fillet4_piece_7a & fillet4_piece_7b
    add(fillet4_piece_7, mode=Mode.SUBTRACT)
    with BuildSketch(Plane(origin=(10, 10, -2.5), x_dir=(0, -1, 0), z_dir=(0, 0, -1))) as fillet4_piece_8a_section:
        with BuildLine():
            CenterArc((FILLET4_R, FILLET4_R), FILLET4_R, 180, 90)
            Line((0, FILLET4_R), (-FILLET4_R * 0.02, FILLET4_R))
            Line((-FILLET4_R * 0.02, FILLET4_R), (-FILLET4_R * 0.02, -FILLET4_R * 0.02))
            Line((-FILLET4_R * 0.02, -FILLET4_R * 0.02), (FILLET4_R, -FILLET4_R * 0.02))
            Line((FILLET4_R, -FILLET4_R * 0.02), (FILLET4_R, 0))
        make_face()
    fillet4_piece_8a = extrude(amount=22.5, mode=Mode.PRIVATE)
    fillet4_piece_8a = split(fillet4_piece_8a, bisect_by=Plane(origin=(8.868024429, 8.868024429, -15), z_dir=(0, 0, 1)), keep=Keep.TOP, mode=Mode.PRIVATE)
    with BuildSketch(Plane(origin=(-2.5, 10, -15), x_dir=(0, -1, 0), z_dir=(1, 0, 0))) as fillet4_piece_8b_section:
        with BuildLine():
            CenterArc((FILLET4_R, -FILLET4_R), FILLET4_R, 90, 90)
            Line((0, -FILLET4_R), (-FILLET4_R * 0.02, -FILLET4_R))
            Line((-FILLET4_R * 0.02, -FILLET4_R), (-FILLET4_R * 0.02, FILLET4_R * 0.02))
            Line((-FILLET4_R * 0.02, FILLET4_R * 0.02), (FILLET4_R, FILLET4_R * 0.02))
            Line((FILLET4_R, FILLET4_R * 0.02), (FILLET4_R, 0))
        make_face()
    fillet4_piece_8b = extrude(amount=37.5, mode=Mode.PRIVATE)
    fillet4_piece_8b = split(fillet4_piece_8b, bisect_by=Plane(origin=(10, 8.868024429, -13.868024429), z_dir=(-1, 0, 0)), keep=Keep.TOP, mode=Mode.PRIVATE)
    fillet4_piece_8 = fillet4_piece_8a & fillet4_piece_8b
    add(fillet4_piece_8, mode=Mode.SUBTRACT)
    with BuildSketch(Plane(origin=(10, 10, 2.5), x_dir=(0, -1, 0), z_dir=(0, 0, 1))) as fillet4_piece_9a_section:
        with BuildLine():
            CenterArc((FILLET4_R, -FILLET4_R), FILLET4_R, 90, 90)
            Line((0, -FILLET4_R), (-FILLET4_R * 0.02, -FILLET4_R))
            Line((-FILLET4_R * 0.02, -FILLET4_R), (-FILLET4_R * 0.02, FILLET4_R * 0.02))
            Line((-FILLET4_R * 0.02, FILLET4_R * 0.02), (FILLET4_R, FILLET4_R * 0.02))
            Line((FILLET4_R, FILLET4_R * 0.02), (FILLET4_R, 0))
        make_face()
    fillet4_piece_9a = extrude(amount=22.5, mode=Mode.PRIVATE)
    fillet4_piece_9a = split(fillet4_piece_9a, bisect_by=Plane(origin=(8.868024429, 8.868024429, 15), z_dir=(0, 0, -1)), keep=Keep.TOP, mode=Mode.PRIVATE)
    with BuildSketch(Plane(origin=(-2.5, 10, 15), x_dir=(0, -1, 0), z_dir=(1, 0, 0))) as fillet4_piece_9b_section:
        with BuildLine():
            CenterArc((FILLET4_R, FILLET4_R), FILLET4_R, 180, 90)
            Line((0, FILLET4_R), (-FILLET4_R * 0.02, FILLET4_R))
            Line((-FILLET4_R * 0.02, FILLET4_R), (-FILLET4_R * 0.02, -FILLET4_R * 0.02))
            Line((-FILLET4_R * 0.02, -FILLET4_R * 0.02), (FILLET4_R, -FILLET4_R * 0.02))
            Line((FILLET4_R, -FILLET4_R * 0.02), (FILLET4_R, 0))
        make_face()
    fillet4_piece_9b = extrude(amount=37.5, mode=Mode.PRIVATE)
    fillet4_piece_9b = split(fillet4_piece_9b, bisect_by=Plane(origin=(10, 8.868024429, 13.868024429), z_dir=(-1, 0, 0)), keep=Keep.TOP, mode=Mode.PRIVATE)
    fillet4_piece_9 = fillet4_piece_9a & fillet4_piece_9b
    add(fillet4_piece_9, mode=Mode.SUBTRACT)

    # Sketch19 → Cut-Extrude10 (cut)
    with BuildSketch(Plane(origin=(0, 5, 0), x_dir=(1, 0, 0), z_dir=(0, 1, 0))):
        with Locations(Location((15, 0, 0), (0, 0, 270))):
            Circle(SKETCH19_R)
    extrude(amount=-CUT_EXTRUDE10_DEPTH, mode=Mode.SUBTRACT)


with BuildPart() as cut_extrude9_piece_2:
    # of the separate pieces the step leaves, piece 2, a body of its own (cut_extrude9_pieces)
    add(part.part.solids().sort_by_distance((39, -10, 15))[0])

    # Fillet5
    # the kernel refuses this fillet: 5 mm, written as the material it takes off along each edge
    with BuildSketch(Plane(origin=(45, 5, 10), x_dir=(0, 0, 1), z_dir=(1, 0, 0))) as fillet5_piece_1_section:
        Polygon((0, 0), (FILLET5_R, 0), (FILLET5_R, -FILLET5_R), (0, -FILLET5_R), align=None)
    fillet5_piece_1 = extrude(amount=FILLET5_R, mode=Mode.PRIVATE)
    fillet5_piece_1 = fillet5_piece_1 - Plane(origin=(45, 5, 10), x_dir=(0, -0.7071067811865475, -0.7071067811865475), z_dir=(1, 0, 0)) * Sphere(FILLET5_R, mode=Mode.PRIVATE)
    add(fillet5_piece_1, mode=Mode.SUBTRACT)
    with BuildSketch(Plane(origin=(45, 5, -10), x_dir=(1, 0, 0), z_dir=(0, 0, -1))) as fillet5_piece_2_section:
        Polygon((0, 0), (FILLET5_R, 0), (FILLET5_R, -FILLET5_R), (0, -FILLET5_R), align=None)
    fillet5_piece_2 = extrude(amount=FILLET5_R, mode=Mode.PRIVATE)
    fillet5_piece_2 = fillet5_piece_2 - Plane(origin=(45, 5, -10), x_dir=(-0.7071067811865475, -0.7071067811865475, 0), z_dir=(0, 0, -1)) * Sphere(FILLET5_R, mode=Mode.PRIVATE)
    add(fillet5_piece_2, mode=Mode.SUBTRACT)
    with BuildSketch(Plane(origin=(50, 5, 15), x_dir=(0, 0, -1), z_dir=(0, -1, 0))) as fillet5_piece_3:
        with BuildLine():
            CenterArc((FILLET5_R, -FILLET5_R), FILLET5_R, 90, 90)
            Line((0, -FILLET5_R), (0, 0))
            Line((0, 0), (FILLET5_R, 0))
        make_face()
    extrude(amount=27.5, mode=Mode.SUBTRACT)
    with BuildSketch(Plane(origin=(50, -22.5, -15), x_dir=(-1, 0, 0), z_dir=(0, 1, 0))) as fillet5_piece_4:
        with BuildLine():
            CenterArc((FILLET5_R, FILLET5_R), FILLET5_R, 180, 90)
            Line((0, FILLET5_R), (0, 0))
            Line((0, 0), (FILLET5_R, 0))
        make_face()
    extrude(amount=27.5, mode=Mode.SUBTRACT)
    with BuildSketch(Plane(origin=(50, 10, -10), x_dir=(0, -1, 0), z_dir=(0, 0, 1))) as fillet5_piece_5:
        with BuildLine():
            CenterArc((FILLET5_R, -FILLET5_R), FILLET5_R, 90, 90)
            Line((0, -FILLET5_R), (0, 0))
            Line((0, 0), (FILLET5_R, 0))
        make_face()
    extrude(amount=20, mode=Mode.SUBTRACT)
    with BuildSketch(Plane(origin=(26.5, 10, 15), x_dir=(0, -1, 0), z_dir=(1, 0, 0))) as fillet5_piece_6:
        with BuildLine():
            CenterArc((FILLET5_R, FILLET5_R), FILLET5_R, 180, 90)
            Line((0, FILLET5_R), (0, 0))
            Line((0, 0), (FILLET5_R, 0))
        make_face()
    extrude(amount=18.5, mode=Mode.SUBTRACT)
    with BuildSketch(Plane(origin=(26.5, 10, -15), x_dir=(0, -1, 0), z_dir=(1, 0, 0))) as fillet5_piece_7:
        with BuildLine():
            CenterArc((FILLET5_R, -FILLET5_R), FILLET5_R, 90, 90)
            Line((0, -FILLET5_R), (0, 0))
            Line((0, 0), (FILLET5_R, 0))
        make_face()
    extrude(amount=18.5, mode=Mode.SUBTRACT)


solid = Compound([cut_extrude9_piece_1.part, cut_extrude9_piece_2.part])
